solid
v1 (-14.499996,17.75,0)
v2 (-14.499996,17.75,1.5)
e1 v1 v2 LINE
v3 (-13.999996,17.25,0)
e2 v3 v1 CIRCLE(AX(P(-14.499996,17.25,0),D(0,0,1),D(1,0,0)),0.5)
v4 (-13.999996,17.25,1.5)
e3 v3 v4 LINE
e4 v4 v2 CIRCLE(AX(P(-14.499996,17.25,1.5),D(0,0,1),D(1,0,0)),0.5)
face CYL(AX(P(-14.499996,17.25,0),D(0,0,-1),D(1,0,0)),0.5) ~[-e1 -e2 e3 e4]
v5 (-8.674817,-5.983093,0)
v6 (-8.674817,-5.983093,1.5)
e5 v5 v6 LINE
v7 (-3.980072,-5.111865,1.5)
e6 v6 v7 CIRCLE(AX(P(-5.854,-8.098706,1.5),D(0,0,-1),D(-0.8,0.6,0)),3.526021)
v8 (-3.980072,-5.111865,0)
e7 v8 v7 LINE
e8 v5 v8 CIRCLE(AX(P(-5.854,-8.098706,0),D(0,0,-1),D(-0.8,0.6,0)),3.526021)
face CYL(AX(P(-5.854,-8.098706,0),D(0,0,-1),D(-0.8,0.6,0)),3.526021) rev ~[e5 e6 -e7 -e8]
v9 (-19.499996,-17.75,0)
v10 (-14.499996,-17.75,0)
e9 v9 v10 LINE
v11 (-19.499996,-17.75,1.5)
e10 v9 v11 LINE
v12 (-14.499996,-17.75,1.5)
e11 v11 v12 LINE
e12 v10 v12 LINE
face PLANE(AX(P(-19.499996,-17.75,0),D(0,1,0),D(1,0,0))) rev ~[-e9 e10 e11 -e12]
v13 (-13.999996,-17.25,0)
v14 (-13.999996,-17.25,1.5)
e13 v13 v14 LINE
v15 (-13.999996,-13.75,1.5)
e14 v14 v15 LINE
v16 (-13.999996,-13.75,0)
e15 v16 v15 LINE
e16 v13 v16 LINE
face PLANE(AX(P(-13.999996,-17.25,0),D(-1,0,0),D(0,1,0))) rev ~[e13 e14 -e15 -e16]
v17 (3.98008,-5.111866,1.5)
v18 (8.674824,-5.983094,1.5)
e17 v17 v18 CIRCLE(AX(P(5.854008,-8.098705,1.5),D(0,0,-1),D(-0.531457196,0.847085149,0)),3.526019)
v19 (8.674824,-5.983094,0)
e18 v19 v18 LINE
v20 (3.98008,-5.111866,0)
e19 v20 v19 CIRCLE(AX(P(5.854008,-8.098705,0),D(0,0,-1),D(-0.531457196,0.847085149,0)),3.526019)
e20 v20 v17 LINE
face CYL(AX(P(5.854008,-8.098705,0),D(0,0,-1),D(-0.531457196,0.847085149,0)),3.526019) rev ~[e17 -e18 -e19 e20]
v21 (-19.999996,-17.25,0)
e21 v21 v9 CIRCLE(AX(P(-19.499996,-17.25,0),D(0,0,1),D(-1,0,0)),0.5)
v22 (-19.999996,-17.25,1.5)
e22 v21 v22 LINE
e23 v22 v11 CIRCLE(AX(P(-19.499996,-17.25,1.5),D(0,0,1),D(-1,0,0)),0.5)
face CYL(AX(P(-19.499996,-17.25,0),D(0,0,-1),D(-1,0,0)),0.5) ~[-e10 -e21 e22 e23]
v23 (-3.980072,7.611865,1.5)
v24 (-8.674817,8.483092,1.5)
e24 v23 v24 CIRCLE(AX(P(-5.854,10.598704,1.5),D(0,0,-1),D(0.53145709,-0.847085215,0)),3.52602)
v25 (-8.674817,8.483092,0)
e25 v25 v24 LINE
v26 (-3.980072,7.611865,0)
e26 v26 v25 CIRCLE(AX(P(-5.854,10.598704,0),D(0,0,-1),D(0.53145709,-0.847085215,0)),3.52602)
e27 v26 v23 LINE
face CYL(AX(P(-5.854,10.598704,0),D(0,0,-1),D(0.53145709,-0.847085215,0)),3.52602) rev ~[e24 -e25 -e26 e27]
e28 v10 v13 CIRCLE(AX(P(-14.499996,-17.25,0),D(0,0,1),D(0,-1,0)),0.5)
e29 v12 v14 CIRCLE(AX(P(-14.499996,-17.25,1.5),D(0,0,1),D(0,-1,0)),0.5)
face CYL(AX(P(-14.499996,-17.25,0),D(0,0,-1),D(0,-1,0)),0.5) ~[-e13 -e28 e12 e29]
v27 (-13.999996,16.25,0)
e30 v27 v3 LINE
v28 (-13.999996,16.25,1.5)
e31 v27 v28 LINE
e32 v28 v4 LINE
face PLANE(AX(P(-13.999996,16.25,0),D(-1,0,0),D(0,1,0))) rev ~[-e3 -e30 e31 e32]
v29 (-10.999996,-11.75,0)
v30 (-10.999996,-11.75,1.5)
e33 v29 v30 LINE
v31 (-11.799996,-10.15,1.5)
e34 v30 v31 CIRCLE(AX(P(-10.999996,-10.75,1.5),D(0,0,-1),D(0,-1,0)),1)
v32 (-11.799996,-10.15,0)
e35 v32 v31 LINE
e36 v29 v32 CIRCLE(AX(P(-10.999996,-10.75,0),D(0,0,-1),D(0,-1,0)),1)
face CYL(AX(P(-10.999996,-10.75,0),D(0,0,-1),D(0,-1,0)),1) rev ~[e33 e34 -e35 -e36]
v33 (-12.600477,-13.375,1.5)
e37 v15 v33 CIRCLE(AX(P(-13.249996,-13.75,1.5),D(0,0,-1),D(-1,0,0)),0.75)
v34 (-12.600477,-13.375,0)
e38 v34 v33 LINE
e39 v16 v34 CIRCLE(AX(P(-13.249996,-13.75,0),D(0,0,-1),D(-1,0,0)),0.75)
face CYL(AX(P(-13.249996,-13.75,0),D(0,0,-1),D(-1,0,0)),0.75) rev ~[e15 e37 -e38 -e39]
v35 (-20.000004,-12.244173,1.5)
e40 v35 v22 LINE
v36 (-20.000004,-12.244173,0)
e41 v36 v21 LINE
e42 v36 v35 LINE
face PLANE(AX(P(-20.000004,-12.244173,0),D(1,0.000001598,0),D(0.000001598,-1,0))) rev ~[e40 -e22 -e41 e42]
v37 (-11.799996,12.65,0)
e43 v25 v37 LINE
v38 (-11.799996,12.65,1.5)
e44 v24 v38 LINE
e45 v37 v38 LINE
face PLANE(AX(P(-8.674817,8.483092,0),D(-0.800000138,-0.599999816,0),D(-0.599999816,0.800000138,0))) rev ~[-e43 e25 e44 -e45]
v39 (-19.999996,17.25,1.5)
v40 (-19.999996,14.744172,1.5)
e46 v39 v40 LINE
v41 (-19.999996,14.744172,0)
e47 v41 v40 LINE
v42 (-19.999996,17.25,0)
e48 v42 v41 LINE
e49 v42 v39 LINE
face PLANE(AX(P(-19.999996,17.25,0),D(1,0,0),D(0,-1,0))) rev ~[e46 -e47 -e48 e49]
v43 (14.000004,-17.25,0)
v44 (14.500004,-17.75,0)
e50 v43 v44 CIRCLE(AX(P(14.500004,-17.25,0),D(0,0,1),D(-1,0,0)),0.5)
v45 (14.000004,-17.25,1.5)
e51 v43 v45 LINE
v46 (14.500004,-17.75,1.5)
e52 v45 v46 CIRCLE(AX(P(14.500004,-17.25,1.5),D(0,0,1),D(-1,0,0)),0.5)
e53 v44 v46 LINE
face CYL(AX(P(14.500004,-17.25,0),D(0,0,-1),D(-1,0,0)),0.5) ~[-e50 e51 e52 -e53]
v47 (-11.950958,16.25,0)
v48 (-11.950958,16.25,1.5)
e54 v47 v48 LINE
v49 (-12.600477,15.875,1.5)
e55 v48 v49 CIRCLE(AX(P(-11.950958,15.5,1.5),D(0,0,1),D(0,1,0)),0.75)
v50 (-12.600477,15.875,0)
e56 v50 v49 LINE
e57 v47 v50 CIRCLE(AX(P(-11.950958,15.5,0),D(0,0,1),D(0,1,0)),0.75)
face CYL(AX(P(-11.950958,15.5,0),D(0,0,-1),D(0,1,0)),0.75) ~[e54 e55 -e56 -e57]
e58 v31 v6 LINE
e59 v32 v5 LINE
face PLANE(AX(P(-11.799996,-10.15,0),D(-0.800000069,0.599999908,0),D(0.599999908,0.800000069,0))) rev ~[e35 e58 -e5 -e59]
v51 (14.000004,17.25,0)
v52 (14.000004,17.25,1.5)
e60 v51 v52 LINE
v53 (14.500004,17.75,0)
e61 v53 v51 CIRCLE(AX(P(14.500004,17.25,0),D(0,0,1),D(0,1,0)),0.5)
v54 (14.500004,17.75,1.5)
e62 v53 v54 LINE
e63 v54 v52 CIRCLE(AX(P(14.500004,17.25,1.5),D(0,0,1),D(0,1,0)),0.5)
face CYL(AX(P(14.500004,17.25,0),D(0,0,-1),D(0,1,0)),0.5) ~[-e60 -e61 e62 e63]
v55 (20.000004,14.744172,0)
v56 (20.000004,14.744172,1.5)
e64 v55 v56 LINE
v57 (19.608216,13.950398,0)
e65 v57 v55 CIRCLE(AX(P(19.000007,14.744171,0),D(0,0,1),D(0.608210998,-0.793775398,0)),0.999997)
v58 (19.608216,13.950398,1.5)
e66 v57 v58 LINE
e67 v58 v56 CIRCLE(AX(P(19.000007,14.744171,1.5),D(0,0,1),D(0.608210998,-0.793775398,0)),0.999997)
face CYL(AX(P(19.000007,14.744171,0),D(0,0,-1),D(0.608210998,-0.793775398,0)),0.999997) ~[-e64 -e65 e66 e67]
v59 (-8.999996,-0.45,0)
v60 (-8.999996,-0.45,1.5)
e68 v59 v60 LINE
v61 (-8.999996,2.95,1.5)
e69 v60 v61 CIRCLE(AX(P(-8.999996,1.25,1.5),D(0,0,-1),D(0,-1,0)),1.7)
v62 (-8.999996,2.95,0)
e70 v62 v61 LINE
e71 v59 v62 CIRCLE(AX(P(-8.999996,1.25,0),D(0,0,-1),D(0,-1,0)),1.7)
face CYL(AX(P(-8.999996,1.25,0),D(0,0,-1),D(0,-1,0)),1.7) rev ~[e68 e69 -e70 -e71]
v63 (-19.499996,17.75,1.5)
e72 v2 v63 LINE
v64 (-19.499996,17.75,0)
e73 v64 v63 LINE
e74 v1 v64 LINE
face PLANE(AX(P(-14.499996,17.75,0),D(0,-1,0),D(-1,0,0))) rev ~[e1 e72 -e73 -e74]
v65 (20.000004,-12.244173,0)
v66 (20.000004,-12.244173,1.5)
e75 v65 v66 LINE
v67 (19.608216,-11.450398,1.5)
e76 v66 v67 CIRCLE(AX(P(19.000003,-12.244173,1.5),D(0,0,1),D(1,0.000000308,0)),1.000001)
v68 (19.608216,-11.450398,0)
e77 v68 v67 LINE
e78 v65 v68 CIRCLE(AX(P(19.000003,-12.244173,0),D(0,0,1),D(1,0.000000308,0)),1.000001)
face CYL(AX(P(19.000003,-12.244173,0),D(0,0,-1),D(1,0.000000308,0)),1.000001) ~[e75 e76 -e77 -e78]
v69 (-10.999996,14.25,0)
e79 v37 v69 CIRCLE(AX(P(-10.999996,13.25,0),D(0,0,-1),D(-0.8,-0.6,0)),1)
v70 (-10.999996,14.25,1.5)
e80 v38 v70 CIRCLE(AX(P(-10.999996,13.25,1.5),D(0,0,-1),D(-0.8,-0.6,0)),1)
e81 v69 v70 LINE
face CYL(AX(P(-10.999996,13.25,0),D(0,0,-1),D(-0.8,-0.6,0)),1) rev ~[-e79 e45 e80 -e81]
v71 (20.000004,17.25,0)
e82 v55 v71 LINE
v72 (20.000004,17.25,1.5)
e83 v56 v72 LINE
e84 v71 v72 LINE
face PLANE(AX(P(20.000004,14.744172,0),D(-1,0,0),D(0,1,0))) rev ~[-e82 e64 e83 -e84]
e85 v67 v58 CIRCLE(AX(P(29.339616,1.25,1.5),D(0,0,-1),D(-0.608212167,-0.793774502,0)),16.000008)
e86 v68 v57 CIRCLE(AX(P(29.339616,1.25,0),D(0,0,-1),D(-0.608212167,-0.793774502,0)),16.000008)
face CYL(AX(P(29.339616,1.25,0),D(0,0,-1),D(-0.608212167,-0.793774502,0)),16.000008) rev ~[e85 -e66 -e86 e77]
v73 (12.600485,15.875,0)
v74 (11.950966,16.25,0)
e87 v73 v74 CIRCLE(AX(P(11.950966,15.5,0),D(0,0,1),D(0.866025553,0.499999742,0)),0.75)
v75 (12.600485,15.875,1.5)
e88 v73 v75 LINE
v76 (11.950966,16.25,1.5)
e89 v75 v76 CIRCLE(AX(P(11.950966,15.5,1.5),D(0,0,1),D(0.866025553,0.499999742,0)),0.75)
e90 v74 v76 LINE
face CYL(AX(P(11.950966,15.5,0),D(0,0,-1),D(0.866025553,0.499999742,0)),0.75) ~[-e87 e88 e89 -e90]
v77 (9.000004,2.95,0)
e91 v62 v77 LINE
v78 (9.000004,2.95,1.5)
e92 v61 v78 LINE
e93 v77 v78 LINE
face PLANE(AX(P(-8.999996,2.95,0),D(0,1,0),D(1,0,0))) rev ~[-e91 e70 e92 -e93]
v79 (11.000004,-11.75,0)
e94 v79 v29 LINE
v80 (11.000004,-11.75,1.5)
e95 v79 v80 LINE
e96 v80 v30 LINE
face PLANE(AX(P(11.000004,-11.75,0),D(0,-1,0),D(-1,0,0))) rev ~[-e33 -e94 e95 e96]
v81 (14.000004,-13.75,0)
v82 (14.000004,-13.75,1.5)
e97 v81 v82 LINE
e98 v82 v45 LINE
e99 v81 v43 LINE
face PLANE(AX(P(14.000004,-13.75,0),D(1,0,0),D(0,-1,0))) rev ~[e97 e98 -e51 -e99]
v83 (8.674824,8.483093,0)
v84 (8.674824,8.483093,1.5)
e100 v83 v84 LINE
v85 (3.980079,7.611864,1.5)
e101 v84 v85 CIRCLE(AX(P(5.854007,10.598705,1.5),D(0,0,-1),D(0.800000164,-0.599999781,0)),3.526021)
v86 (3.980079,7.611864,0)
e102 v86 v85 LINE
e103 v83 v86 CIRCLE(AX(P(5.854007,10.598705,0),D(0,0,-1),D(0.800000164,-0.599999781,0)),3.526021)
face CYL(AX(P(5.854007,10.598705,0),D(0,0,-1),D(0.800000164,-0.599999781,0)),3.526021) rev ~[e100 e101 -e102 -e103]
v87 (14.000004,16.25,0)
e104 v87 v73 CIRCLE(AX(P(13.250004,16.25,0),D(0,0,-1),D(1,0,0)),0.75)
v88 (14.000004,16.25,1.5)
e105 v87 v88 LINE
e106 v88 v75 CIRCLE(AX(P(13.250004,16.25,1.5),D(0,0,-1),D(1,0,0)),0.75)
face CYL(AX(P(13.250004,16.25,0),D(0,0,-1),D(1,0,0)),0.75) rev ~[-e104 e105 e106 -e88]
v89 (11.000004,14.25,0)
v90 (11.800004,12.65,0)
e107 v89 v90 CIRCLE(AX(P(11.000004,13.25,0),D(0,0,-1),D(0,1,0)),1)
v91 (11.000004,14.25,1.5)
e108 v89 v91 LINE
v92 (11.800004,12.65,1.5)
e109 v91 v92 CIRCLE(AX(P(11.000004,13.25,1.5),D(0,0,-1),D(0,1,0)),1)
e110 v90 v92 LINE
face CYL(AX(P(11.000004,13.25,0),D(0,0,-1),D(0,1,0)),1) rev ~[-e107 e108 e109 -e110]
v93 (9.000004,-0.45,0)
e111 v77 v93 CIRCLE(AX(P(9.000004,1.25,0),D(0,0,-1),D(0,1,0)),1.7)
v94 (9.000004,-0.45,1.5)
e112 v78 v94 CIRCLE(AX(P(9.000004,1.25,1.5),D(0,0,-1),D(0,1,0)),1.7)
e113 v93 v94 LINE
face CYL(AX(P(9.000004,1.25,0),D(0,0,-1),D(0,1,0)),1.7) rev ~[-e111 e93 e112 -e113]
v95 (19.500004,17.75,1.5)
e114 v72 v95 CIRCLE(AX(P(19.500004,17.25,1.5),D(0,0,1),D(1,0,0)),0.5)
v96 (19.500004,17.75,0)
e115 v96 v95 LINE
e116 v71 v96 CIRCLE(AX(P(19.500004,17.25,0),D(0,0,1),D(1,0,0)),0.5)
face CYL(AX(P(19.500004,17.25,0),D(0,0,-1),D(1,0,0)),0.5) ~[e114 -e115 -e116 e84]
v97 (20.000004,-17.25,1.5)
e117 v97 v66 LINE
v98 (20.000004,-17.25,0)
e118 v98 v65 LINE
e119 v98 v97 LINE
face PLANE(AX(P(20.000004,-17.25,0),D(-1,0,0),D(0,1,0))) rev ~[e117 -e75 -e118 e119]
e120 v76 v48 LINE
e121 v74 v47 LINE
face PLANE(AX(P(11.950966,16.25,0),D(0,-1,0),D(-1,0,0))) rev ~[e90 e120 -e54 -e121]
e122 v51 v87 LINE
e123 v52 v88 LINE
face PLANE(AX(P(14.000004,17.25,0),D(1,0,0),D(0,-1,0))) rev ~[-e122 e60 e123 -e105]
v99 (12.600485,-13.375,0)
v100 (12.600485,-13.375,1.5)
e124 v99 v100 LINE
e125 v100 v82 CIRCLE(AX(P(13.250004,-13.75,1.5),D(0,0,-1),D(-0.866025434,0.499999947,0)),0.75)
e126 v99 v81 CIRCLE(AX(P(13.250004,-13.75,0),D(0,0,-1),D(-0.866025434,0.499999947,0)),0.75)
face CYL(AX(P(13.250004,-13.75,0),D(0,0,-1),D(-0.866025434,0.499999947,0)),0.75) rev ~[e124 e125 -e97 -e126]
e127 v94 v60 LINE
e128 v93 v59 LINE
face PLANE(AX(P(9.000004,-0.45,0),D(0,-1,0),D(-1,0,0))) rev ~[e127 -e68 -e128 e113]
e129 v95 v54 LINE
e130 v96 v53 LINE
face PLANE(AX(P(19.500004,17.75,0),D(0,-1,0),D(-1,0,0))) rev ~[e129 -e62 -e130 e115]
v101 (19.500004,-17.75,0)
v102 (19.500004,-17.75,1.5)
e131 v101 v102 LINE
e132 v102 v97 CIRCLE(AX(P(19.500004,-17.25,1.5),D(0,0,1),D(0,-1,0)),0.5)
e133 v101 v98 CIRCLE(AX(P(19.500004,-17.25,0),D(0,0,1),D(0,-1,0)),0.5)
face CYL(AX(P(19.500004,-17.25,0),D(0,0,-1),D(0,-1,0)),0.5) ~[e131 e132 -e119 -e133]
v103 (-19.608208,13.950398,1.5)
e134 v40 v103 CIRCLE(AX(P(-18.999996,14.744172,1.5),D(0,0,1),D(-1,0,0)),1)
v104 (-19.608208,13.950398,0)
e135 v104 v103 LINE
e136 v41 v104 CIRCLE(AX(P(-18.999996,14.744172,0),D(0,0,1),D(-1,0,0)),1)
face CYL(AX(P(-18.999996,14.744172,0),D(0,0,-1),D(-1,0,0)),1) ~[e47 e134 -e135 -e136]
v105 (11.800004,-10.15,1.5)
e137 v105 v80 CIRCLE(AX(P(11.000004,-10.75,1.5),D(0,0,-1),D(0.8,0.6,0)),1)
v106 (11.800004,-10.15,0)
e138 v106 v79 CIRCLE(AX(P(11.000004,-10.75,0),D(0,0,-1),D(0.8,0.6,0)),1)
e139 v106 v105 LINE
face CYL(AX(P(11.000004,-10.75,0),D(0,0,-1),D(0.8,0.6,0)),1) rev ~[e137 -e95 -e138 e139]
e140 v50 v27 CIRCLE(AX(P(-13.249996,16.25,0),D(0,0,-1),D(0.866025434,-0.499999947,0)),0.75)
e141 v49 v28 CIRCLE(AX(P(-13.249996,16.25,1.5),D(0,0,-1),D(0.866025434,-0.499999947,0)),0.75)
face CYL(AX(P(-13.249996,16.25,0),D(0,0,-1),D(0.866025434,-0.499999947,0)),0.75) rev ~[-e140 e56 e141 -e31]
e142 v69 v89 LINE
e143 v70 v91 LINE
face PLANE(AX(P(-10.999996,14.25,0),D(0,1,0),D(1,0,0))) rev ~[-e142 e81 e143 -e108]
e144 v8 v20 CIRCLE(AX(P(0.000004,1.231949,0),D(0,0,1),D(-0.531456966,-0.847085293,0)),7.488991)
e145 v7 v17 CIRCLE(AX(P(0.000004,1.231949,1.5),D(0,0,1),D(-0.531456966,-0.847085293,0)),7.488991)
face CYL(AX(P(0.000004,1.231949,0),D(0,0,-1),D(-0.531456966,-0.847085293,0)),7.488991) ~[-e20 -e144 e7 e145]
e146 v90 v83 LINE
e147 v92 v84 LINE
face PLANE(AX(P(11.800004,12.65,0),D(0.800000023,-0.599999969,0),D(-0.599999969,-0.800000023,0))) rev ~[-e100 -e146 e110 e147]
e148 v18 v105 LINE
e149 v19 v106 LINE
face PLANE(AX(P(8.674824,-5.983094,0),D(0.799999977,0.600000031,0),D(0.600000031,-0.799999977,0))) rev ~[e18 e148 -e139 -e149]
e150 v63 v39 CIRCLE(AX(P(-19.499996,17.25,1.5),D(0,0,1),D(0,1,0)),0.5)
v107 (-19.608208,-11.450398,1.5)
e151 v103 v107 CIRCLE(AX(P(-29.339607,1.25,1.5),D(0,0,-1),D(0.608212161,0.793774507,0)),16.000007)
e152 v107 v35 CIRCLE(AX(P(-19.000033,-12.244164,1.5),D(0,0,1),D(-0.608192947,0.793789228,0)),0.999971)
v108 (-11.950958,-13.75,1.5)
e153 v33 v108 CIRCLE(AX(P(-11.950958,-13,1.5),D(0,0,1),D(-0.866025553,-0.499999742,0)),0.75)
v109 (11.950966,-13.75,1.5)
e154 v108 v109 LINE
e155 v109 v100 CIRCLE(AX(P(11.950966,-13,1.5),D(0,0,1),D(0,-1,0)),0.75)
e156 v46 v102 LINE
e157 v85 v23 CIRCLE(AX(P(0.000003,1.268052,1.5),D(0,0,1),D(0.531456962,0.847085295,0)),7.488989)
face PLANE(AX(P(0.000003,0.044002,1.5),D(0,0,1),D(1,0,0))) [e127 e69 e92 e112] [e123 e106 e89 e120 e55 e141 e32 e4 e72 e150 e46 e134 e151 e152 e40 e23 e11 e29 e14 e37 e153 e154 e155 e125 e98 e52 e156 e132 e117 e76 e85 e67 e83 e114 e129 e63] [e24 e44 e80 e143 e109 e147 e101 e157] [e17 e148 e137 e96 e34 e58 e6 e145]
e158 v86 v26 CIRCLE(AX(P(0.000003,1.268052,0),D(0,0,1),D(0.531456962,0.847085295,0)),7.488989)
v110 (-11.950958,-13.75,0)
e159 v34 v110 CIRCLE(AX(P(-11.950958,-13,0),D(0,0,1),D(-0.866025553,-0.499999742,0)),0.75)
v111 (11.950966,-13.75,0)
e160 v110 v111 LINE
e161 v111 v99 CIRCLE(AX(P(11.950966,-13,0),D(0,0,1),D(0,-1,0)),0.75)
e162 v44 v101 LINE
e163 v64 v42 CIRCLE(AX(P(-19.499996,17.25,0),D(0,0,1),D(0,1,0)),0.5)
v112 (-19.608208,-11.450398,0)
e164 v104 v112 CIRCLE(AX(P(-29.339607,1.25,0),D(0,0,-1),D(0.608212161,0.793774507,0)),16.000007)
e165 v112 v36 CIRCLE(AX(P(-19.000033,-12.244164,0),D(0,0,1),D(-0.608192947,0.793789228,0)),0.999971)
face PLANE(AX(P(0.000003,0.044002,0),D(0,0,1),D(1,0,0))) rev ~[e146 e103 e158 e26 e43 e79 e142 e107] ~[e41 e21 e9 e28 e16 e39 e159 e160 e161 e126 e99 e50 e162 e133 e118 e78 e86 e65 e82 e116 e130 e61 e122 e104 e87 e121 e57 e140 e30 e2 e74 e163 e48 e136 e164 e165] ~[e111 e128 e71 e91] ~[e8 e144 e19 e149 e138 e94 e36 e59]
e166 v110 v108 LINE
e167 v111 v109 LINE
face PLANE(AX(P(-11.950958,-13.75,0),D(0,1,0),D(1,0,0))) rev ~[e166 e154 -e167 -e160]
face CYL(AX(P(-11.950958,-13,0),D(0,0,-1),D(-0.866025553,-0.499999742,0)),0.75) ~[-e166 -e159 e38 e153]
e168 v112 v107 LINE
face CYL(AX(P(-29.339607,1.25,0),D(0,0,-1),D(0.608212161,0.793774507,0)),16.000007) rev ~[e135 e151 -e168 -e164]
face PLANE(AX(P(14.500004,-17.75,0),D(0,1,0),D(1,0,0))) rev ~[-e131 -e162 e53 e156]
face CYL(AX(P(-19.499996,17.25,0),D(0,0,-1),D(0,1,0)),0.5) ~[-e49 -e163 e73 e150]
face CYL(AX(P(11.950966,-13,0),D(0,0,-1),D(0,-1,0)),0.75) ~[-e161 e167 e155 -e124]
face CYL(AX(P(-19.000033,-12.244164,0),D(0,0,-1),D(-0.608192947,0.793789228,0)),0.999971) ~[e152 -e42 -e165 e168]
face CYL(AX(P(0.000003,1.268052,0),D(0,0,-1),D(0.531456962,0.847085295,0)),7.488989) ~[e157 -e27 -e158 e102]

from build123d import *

# Parameters (mm, degrees)
F1_DEPTH = 1.5


# Not quite as in the source:
# - ends of sketch curves that miss each other by under 0.0002 mm in the source are joined


with BuildPart() as f1:
    # F0 (on Top) → F1 (new body)
    with BuildSketch(Plane.XY):
        with BuildLine():
            ThreePointArc((19.6082164698, -11.4503983868), (13.339608, 1.2499996959), (19.608215987, 13.9503980169))
            ThreePointArc((19.608215987, 13.9503980169), (19.8967236619, 14.3015730303), (20.000004, 14.744172))
            Line((20.000004, 14.744172), (20.000004, 17.25))
            ThreePointArc((20.000004, 17.25), (19.8535573906, 17.6035533906), (19.500004, 17.75))
            Line((19.500004, 17.75), (14.500004, 17.75))
            ThreePointArc((14.500004, 17.75), (14.1464506094, 17.6035533906), (14.000004, 17.25))
            Line((14.000004, 17.25), (14.000004, 16.25))
            ThreePointArc((14.000004, 16.25), (13.4441182966, 15.5255556337), (12.6004849604, 15.8749999771))
            ThreePointArc((12.6004849604, 15.8749999771), (12.3259659886, 16.1495190594), (11.950966, 16.25))
            Line((11.950966, 16.25), (-11.950958, 16.25))
            ThreePointArc((-11.950958, 16.25), (-12.3259579886, 16.1495190594), (-12.6004770396, 15.8750000229))
            ThreePointArc((-12.6004770396, 15.8750000229), (-13.4441102966, 15.5255556337), (-13.999996, 16.25))
            Line((-13.999996, 16.25), (-13.999996, 17.25))
            ThreePointArc((-13.999996, 17.25), (-14.1464426094, 17.6035533906), (-14.499996, 17.75))
            Line((-14.499996, 17.75), (-19.499996, 17.75))
            ThreePointArc((-19.499996, 17.75), (-19.8535493906, 17.6035533906), (-19.999996, 17.25))
            Line((-19.999996, 17.25), (-19.999996, 14.744172))
            ThreePointArc((-19.999996, 14.744172), (-19.8967156619, 14.3015730303), (-19.6082083041, 13.9503976031))
            ThreePointArc((-19.6082083041, 13.9503976031), (-13.3396, 1.2499996959), (-19.6082084698, -11.4503983868))
            ThreePointArc((-19.6082084698, -11.4503983868), (-19.8967227718, -11.8015703601), (-20.000004, -12.244173))
            Line((-20.000004, -12.244173), (-19.999996, -17.25))
            ThreePointArc((-19.999996, -17.25), (-19.8535493906, -17.6035533906), (-19.499996, -17.75))
            Line((-19.499996, -17.75), (-14.499996, -17.75))
            ThreePointArc((-14.499996, -17.75), (-14.1464426094, -17.6035533906), (-13.999996, -17.25))
            Line((-13.999996, -17.25), (-13.999996, -13.75))
            ThreePointArc((-13.999996, -13.75), (-13.4441102966, -13.0255556337), (-12.6004769604, -13.3749999771))
            ThreePointArc((-12.6004769604, -13.3749999771), (-12.3259579886, -13.6495190594), (-11.950958, -13.75))
            Line((-11.950958, -13.75), (11.950966, -13.75))
            ThreePointArc((11.950966, -13.75), (12.3259659886, -13.6495190594), (12.6004850396, -13.3750000229))
            ThreePointArc((12.6004850396, -13.3750000229), (13.4441182966, -13.0255556337), (14.000004, -13.75))
            Line((14.000004, -13.75), (14.000004, -17.25))
            ThreePointArc((14.000004, -17.25), (14.1464506094, -17.6035533906), (14.500004, -17.75))
            Line((14.500004, -17.75), (19.500004, -17.75))
            ThreePointArc((19.500004, -17.75), (19.8535573906, -17.6035533906), (20.000004, -17.25))
            Line((20.000004, -17.25), (20.000004, -12.244173))
            ThreePointArc((20.000004, -12.244173), (19.8967236619, -11.8015740303), (19.6082164698, -11.4503983868))
        make_face()
        with BuildLine():
            ThreePointArc((-8.6748168, -5.9830934), (-6.4973578405, -4.6318753463), (-3.9800720916, -5.1118651461))
            ThreePointArc((-3.9800720916, -5.1118651461), (3.5765e-06, -6.257042), (3.980079547, -5.1118658719))
            ThreePointArc((3.980079547, -5.1118658719), (6.4973651354, -4.631875401), (8.67482416, -5.98309388))
            Line((8.67482416, -5.98309388), (11.800004, -10.15))
            ThreePointArc((11.800004, -10.15), (11.894431191, -11.1972135955), (11.000004, -11.75))
            Line((11.000004, -11.75), (-10.999996, -11.75))
            ThreePointArc((-10.999996, -11.75), (-11.894423191, -11.1972135955), (-11.799996, -10.15))
            Line((-11.799996, -10.15), (-8.6748168, -5.9830934))
        make_face(mode=Mode.SUBTRACT)
        with BuildLine():
            ThreePointArc((9.000004, 2.95), (10.700004, 1.25), (9.000004, -0.45))
            Line((9.000004, -0.45), (-8.999996, -0.45))
            ThreePointArc((-8.999996, -0.45), (-10.699996, 1.25), (-8.999996, 2.95))
            Line((-8.999996, 2.95), (9.000004, 2.95))
        make_face(mode=Mode.SUBTRACT)
        with BuildLine():
            Line((-10.999996, 14.25), (11.000004, 14.25))
            ThreePointArc((11.000004, 14.25), (11.894431191, 13.6972135955), (11.800004, 12.65))
            Line((11.800004, 12.65), (8.674824, 8.483093))
            ThreePointArc((8.674824, 8.483093), (6.4973648742, 7.1318743525), (3.9800786415, 7.6118644285))
            ThreePointArc((3.9800786415, 7.6118644285), (3.5765e-06, 8.757041), (-3.9800718144, 7.6118647041))
            ThreePointArc((-3.9800718144, 7.6118647041), (-6.4973575792, 7.1318742978), (-8.6748168, 8.4830924))
            Line((-8.6748168, 8.4830924), (-11.799996, 12.65))
            ThreePointArc((-11.799996, 12.65), (-11.894423191, 13.6972135955), (-10.999996, 14.25))
        make_face(mode=Mode.SUBTRACT)
    extrude(amount=F1_DEPTH)


solid = f1.part
